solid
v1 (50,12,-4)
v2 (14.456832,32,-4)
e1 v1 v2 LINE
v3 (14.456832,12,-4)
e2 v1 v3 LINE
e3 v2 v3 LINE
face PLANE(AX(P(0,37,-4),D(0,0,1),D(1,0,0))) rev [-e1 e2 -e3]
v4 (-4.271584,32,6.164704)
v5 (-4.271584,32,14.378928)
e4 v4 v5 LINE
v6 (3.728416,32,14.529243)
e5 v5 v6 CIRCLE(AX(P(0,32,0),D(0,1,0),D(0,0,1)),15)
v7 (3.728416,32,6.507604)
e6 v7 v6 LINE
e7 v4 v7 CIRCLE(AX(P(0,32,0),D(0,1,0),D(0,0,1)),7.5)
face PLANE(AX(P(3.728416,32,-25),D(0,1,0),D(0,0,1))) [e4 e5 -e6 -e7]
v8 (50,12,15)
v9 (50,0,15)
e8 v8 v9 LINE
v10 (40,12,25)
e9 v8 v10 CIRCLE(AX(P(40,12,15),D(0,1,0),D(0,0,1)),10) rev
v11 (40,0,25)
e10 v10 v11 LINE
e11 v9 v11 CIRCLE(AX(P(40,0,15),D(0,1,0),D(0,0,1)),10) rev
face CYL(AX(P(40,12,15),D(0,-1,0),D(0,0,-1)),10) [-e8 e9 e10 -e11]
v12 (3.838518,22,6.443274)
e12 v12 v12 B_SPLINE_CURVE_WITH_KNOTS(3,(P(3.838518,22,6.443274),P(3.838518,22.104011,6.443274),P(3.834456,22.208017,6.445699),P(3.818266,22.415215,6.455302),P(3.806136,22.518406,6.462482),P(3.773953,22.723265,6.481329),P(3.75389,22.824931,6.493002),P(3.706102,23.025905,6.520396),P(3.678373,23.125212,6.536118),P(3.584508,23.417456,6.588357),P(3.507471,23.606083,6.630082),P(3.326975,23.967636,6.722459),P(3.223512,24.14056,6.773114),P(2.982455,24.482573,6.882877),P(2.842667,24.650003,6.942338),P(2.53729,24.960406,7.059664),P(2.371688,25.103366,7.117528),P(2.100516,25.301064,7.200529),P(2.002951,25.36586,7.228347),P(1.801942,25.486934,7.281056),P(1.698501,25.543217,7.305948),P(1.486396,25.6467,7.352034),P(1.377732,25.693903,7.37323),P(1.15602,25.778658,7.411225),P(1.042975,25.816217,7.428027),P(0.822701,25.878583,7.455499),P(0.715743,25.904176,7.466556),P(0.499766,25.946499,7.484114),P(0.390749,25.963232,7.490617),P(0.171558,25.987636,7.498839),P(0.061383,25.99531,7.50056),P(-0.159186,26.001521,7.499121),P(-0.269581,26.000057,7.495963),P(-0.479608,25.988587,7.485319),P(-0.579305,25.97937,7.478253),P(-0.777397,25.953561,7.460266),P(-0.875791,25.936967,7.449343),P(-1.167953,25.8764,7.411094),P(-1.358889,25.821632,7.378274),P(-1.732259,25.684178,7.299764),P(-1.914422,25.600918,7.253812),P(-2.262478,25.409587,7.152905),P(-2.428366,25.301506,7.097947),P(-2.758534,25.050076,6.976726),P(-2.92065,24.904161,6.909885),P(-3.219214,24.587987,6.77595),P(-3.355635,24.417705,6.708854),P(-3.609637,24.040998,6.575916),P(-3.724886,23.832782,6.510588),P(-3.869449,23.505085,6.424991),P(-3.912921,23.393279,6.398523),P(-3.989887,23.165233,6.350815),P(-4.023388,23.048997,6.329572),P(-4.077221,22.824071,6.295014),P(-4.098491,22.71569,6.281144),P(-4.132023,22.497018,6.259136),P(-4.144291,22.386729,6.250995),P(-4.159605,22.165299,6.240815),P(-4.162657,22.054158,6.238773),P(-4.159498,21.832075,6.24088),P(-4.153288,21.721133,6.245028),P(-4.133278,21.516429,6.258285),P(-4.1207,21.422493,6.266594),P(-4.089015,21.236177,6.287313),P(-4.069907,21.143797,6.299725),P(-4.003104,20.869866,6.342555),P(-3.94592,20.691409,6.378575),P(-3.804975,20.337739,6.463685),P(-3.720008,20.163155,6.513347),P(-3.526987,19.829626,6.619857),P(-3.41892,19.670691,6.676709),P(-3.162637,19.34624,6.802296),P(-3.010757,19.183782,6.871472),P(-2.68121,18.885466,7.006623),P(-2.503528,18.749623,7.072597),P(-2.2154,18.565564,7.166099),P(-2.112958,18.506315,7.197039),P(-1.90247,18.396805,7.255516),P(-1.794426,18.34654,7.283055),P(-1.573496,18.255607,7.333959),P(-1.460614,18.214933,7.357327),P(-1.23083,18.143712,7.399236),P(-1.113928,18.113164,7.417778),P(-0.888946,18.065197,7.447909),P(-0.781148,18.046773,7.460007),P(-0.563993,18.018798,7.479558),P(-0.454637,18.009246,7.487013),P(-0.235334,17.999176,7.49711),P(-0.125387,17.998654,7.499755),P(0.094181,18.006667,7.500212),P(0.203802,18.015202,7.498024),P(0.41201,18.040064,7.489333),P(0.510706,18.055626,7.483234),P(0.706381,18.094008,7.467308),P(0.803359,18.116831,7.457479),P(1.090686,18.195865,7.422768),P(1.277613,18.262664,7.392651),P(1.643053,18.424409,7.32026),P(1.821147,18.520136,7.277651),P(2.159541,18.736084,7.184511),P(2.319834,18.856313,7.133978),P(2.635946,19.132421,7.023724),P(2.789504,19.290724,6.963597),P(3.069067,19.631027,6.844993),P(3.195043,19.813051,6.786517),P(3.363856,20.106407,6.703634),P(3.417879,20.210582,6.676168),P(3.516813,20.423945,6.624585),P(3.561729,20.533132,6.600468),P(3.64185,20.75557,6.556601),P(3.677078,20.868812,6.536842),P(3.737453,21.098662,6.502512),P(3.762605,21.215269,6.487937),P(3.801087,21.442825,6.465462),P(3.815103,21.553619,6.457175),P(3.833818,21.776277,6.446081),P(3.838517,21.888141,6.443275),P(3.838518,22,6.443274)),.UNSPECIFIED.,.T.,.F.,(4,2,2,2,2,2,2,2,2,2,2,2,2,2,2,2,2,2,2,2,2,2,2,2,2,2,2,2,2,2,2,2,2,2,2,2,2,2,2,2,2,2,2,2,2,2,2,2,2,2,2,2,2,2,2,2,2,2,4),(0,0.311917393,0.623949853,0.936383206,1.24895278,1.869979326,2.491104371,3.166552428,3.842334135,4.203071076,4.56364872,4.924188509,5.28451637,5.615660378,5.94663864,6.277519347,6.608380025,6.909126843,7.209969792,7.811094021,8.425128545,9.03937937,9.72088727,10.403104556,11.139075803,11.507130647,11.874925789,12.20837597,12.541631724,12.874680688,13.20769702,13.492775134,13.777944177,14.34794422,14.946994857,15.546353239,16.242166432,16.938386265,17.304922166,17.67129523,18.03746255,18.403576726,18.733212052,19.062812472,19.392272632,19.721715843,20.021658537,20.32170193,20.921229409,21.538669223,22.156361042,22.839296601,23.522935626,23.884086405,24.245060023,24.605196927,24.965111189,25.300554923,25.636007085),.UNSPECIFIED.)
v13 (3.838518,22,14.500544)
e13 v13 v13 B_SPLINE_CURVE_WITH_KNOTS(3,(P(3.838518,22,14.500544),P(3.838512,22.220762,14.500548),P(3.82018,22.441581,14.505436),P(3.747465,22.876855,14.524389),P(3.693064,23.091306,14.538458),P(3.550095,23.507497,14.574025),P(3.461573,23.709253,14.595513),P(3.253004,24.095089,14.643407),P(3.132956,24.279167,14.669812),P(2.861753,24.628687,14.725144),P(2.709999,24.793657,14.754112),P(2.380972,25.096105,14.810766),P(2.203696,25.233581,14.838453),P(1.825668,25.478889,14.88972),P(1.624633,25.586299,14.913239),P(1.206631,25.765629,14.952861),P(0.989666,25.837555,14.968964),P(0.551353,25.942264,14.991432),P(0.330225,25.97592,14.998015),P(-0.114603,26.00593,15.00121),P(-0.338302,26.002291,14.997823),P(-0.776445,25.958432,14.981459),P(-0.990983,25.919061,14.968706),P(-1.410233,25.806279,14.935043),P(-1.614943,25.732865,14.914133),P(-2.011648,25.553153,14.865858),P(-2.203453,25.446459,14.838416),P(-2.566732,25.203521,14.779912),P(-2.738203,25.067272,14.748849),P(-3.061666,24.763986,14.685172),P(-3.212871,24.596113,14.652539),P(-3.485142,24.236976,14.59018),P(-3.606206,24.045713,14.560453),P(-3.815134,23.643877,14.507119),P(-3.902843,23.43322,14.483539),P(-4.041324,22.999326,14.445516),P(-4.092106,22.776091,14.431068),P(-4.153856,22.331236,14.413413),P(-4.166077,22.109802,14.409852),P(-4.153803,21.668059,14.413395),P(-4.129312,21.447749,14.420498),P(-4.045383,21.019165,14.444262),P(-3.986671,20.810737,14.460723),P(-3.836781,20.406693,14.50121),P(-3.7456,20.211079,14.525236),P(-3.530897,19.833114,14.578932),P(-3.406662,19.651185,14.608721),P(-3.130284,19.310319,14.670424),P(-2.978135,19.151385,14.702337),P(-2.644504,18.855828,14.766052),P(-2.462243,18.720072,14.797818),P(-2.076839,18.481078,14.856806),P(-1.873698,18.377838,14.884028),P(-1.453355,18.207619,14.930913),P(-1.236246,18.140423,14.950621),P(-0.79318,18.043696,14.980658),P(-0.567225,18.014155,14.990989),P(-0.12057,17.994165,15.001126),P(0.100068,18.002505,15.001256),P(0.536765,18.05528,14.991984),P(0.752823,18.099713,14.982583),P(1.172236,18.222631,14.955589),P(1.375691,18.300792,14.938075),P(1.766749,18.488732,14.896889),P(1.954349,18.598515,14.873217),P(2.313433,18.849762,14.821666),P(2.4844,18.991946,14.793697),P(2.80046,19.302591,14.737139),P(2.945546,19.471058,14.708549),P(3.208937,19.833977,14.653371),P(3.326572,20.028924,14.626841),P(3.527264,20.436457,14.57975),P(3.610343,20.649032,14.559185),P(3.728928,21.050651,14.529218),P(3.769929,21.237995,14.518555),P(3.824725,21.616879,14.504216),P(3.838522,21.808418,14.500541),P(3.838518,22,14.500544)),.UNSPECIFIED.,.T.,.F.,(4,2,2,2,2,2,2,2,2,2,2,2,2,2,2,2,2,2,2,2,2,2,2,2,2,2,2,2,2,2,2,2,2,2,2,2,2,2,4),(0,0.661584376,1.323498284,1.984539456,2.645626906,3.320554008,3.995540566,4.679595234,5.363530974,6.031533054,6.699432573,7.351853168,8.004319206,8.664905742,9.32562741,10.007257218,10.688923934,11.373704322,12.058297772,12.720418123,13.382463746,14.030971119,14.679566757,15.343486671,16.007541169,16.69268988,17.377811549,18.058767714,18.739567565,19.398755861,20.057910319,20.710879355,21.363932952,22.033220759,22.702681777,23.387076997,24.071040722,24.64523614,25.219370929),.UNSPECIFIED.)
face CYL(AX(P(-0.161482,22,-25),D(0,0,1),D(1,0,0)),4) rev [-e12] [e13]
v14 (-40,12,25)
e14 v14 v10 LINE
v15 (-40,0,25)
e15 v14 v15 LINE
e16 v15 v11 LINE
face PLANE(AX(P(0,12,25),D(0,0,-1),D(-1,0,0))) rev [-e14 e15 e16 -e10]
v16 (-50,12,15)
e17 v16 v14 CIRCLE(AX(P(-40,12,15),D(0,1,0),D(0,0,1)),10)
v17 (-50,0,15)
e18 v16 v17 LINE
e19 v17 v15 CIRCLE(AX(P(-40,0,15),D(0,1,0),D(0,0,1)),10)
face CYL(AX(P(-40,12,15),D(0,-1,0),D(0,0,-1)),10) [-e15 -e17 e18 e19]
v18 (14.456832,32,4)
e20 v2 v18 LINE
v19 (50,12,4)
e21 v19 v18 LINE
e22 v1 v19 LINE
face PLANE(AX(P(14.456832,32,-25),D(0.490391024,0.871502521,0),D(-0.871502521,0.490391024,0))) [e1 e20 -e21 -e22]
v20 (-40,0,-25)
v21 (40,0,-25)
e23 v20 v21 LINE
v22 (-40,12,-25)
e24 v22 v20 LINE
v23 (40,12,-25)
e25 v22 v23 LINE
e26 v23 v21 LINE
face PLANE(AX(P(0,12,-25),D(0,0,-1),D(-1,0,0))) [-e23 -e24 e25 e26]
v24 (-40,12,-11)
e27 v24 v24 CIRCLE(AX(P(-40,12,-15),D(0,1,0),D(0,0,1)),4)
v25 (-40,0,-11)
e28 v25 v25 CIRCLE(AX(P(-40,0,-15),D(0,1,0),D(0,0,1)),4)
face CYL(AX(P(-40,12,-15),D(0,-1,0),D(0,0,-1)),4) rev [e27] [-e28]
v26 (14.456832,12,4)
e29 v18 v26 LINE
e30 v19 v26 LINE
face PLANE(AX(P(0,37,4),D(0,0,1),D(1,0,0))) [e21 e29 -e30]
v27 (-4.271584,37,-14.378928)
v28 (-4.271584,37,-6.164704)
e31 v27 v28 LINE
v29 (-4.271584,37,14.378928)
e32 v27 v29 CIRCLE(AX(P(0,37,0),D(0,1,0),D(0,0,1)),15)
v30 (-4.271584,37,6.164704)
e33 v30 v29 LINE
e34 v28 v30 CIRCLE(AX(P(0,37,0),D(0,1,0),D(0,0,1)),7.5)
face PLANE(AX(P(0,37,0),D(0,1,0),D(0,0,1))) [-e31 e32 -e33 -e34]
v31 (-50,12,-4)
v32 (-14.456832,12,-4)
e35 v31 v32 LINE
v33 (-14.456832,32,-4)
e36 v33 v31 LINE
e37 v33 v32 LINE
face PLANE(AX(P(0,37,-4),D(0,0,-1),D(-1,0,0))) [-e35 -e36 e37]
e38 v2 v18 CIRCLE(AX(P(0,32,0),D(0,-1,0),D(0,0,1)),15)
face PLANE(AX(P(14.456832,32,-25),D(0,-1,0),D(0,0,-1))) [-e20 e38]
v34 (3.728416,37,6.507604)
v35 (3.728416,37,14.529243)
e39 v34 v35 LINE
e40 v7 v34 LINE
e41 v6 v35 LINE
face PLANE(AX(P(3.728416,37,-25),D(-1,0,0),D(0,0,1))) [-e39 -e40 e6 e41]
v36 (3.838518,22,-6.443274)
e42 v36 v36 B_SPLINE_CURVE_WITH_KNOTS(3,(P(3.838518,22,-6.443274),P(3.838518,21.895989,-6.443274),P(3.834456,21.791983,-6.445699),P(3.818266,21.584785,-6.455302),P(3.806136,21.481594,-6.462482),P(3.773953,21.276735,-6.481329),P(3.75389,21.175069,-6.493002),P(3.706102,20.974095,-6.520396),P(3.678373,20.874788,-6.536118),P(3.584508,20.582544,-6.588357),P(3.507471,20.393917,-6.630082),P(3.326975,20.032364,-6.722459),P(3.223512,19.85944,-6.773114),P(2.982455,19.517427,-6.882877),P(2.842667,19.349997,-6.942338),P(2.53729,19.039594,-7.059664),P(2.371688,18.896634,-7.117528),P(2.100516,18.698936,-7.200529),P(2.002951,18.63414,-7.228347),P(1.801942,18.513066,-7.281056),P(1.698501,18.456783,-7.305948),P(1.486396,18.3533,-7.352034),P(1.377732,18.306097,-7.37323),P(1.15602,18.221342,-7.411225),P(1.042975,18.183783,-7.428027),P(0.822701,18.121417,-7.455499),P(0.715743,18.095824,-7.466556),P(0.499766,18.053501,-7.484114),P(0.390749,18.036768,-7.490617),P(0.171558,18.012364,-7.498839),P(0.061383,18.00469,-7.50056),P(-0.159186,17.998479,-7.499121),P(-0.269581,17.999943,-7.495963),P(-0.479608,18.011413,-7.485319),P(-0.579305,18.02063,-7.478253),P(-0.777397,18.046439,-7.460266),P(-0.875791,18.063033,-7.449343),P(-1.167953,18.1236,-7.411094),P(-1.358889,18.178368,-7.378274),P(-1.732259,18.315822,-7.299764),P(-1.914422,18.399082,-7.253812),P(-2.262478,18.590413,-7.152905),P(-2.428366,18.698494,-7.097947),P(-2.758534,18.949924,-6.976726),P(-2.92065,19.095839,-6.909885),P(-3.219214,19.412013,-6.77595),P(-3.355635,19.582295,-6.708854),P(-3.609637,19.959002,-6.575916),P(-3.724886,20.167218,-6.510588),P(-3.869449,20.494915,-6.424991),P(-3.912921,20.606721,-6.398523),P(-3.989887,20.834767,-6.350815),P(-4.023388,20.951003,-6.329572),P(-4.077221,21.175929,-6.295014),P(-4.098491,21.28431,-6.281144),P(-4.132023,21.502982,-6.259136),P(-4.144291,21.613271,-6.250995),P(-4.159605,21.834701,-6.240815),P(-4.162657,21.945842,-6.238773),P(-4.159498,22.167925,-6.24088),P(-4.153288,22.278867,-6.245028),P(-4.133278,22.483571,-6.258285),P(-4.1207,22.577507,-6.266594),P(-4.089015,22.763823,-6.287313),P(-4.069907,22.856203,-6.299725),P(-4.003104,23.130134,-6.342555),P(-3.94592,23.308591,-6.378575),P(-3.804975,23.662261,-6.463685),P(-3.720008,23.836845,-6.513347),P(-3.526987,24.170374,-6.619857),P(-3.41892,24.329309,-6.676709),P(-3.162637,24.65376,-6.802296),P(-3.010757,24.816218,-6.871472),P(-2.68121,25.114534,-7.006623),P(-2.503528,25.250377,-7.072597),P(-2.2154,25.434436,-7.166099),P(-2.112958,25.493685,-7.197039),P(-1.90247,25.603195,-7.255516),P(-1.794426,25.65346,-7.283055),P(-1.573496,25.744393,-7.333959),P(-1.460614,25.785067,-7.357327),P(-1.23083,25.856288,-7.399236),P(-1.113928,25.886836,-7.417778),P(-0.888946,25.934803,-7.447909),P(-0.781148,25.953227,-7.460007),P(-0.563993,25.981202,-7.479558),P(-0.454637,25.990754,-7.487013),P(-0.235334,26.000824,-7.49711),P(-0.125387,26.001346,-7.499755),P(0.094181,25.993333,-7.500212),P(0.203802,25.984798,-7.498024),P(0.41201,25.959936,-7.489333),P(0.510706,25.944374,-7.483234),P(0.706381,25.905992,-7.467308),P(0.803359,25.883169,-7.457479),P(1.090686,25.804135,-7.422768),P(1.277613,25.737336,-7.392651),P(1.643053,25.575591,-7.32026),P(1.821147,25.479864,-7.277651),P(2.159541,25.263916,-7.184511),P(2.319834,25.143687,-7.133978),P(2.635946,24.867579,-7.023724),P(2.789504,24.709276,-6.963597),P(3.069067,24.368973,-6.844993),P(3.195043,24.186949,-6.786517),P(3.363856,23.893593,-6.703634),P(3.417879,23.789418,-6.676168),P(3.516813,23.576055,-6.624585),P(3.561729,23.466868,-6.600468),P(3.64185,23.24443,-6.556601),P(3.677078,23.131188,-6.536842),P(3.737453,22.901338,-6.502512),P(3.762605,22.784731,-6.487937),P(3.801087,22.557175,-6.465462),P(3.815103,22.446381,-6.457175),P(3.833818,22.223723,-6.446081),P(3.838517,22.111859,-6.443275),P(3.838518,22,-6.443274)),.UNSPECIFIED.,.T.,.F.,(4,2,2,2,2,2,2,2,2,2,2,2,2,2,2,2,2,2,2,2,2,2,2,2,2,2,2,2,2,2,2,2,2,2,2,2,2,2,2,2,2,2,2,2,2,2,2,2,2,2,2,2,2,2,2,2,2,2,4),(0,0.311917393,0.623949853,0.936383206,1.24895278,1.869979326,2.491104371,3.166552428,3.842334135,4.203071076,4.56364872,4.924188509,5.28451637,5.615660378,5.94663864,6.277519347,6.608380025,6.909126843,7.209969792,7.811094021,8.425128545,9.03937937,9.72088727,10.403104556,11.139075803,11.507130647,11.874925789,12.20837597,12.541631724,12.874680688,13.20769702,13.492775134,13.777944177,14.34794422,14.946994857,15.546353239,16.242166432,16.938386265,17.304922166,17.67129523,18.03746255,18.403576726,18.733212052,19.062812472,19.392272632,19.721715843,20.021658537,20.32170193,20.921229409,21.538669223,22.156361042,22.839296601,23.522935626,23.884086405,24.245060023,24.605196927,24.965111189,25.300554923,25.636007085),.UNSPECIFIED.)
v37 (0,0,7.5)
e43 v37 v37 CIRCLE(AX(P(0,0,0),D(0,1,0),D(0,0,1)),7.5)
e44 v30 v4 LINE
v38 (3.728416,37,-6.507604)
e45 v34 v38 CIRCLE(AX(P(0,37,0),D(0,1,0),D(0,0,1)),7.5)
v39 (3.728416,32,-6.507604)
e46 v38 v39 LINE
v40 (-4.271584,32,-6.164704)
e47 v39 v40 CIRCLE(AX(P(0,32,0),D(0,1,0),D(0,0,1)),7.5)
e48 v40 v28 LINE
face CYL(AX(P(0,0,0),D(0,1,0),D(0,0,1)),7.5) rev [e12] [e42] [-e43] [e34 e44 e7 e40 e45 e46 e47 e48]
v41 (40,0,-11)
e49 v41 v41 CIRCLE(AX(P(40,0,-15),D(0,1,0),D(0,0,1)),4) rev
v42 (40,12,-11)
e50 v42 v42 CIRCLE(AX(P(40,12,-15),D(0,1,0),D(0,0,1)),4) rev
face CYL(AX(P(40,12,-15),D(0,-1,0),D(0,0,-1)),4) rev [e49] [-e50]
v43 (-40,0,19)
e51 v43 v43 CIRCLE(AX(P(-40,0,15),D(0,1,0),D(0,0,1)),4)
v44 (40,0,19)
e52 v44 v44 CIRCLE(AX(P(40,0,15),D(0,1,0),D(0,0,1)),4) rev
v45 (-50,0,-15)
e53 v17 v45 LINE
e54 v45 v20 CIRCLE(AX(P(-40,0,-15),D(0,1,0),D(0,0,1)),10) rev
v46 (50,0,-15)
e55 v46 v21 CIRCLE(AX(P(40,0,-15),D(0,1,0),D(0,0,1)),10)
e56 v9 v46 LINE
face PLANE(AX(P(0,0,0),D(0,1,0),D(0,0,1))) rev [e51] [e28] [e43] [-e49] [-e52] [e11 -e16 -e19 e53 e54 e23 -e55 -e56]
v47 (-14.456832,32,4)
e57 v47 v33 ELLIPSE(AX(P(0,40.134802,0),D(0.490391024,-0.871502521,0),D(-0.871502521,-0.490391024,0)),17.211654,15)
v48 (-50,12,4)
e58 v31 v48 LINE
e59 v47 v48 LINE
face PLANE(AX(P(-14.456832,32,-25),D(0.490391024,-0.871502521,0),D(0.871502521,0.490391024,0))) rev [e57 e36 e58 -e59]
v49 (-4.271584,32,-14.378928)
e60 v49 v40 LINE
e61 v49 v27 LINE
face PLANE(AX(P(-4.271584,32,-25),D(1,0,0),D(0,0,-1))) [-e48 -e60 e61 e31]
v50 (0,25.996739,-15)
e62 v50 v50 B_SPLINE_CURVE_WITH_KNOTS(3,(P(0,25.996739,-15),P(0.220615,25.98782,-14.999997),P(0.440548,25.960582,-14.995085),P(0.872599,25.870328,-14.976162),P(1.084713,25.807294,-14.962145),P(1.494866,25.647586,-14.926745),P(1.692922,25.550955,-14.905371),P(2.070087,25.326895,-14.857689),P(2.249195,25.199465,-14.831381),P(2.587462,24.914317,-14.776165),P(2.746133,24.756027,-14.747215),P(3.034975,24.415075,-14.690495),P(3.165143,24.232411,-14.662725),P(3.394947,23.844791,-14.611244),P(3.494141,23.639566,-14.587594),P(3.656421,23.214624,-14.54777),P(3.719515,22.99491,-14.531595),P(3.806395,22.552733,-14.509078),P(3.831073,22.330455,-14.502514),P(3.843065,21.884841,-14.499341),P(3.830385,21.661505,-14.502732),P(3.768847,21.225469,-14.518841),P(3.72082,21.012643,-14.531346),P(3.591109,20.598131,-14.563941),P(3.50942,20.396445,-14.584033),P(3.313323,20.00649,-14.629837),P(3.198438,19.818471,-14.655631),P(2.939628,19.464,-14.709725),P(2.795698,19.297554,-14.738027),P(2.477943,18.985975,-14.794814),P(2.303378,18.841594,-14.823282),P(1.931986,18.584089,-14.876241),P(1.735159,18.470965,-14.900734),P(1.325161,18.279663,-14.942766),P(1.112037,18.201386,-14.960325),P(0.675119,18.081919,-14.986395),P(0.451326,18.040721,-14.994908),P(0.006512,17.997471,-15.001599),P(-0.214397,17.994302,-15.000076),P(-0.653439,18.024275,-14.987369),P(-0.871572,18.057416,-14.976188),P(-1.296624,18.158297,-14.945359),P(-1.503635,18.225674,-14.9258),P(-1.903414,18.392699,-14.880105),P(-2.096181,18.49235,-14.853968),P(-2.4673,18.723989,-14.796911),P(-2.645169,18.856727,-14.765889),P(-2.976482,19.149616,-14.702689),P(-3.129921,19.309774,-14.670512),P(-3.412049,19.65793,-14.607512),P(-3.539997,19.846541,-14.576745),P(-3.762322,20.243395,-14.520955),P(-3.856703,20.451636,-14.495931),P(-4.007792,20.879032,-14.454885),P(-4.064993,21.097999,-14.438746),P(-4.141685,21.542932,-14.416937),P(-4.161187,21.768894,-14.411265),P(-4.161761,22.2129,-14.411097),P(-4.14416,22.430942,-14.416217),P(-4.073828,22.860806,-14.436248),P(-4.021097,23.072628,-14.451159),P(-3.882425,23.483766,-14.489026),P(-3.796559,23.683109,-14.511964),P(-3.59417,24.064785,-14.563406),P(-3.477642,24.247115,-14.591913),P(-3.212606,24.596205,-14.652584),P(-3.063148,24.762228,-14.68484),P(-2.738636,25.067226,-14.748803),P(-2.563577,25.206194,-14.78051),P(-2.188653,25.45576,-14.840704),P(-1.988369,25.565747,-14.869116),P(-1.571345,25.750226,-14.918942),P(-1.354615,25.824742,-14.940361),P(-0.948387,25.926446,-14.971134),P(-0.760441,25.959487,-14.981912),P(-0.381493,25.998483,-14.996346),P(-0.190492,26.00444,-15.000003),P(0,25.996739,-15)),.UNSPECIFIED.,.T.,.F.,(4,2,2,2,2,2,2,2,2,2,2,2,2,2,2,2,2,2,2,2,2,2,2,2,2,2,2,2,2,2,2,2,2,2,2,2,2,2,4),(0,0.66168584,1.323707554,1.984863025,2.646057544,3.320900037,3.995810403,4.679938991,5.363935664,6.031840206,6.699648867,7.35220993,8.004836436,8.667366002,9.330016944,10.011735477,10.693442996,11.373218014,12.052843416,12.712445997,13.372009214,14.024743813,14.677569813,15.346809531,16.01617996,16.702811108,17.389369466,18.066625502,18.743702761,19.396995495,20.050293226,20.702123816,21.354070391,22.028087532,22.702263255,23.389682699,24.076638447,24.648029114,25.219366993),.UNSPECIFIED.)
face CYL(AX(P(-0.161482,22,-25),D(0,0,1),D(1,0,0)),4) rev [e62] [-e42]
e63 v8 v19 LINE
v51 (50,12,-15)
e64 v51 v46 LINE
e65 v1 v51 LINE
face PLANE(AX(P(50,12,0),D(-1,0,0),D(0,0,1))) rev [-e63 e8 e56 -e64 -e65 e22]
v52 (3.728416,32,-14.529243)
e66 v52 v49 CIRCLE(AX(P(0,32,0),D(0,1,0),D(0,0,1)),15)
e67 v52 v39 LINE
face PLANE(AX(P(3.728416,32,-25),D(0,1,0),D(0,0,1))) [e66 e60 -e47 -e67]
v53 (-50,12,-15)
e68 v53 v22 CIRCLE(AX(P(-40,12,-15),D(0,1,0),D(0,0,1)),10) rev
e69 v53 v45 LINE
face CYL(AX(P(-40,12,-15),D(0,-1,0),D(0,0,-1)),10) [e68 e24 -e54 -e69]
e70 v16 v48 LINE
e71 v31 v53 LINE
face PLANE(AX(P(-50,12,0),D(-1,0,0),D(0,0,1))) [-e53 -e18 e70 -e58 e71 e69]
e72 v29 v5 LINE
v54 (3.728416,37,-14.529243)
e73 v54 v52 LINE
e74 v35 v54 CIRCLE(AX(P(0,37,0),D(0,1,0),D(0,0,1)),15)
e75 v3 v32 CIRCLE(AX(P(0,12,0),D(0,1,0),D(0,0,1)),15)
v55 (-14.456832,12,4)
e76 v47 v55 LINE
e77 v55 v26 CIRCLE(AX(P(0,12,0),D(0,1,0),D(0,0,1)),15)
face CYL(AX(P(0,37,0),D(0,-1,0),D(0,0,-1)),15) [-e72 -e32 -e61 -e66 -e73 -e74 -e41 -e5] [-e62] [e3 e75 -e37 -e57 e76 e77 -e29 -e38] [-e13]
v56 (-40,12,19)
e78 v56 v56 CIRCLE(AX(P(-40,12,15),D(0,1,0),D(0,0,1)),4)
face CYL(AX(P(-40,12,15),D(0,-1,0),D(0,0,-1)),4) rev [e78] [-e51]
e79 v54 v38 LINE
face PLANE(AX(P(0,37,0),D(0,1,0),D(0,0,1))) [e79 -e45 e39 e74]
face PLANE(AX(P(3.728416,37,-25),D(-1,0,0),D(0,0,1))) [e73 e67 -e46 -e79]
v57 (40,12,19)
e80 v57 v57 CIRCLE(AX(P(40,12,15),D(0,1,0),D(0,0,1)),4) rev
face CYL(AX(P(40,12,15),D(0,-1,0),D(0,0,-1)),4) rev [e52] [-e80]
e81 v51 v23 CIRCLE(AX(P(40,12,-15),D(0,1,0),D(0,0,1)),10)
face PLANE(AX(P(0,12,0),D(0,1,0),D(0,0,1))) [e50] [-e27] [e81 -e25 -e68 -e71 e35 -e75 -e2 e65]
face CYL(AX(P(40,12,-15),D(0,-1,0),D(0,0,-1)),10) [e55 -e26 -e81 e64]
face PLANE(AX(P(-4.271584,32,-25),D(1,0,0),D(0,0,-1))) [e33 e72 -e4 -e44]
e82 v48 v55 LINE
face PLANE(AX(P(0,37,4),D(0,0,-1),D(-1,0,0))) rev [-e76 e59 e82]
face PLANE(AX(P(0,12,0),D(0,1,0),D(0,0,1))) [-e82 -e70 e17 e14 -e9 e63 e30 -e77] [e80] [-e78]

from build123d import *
from build123d.topology import SkipClean

# Parameters (mm, degrees)
SKETCH_1_R          = 4
EXTRUDE_1_DEPTH     = 12
EXTRUDE_3_DEPTH     = 25
CUT_EXTRUDE_START   = -5
CUT_EXTRUDE_2_DEPTH = 5
SKETCH_6_R          = 4
SKETCH_6_W          = 8
SKETCH_6_H          = 5
CUT_EXTRUDE_3_DEPTH = 69.62944
SKETCH_10_R         = 7.5
CUT_EXTRUDE_4_DEPTH = 68.037303


with BuildPart() as part:
    # 草图1 → 凸台-拉伸1 (new body)
    with BuildSketch(Plane(origin=(0, 0, 0), x_dir=(1, 0, 0), z_dir=(0, 1, 0))):
        with BuildLine():
            ThreePointArc((-40, 25), (-47.071068, 22.071068), (-50, 15))
            Line((-50, 15), (-50, -15))
            ThreePointArc((-50, -15), (-47.071068, -22.071068), (-40, -25))
            Line((-40, -25), (40, -25))
            ThreePointArc((40, -25), (47.071068, -22.071068), (50, -15))
            Line((50, -15), (50, 15))
            ThreePointArc((50, 15), (47.071068, 22.071068), (40, 25))
            Line((40, 25), (-40, 25))
        make_face()
        with Locations((-40, -15)):
            Circle(SKETCH_1_R, mode=Mode.SUBTRACT)
        with Locations((40, -15)):
            Circle(SKETCH_1_R, mode=Mode.SUBTRACT)
        with Locations((-40, 15)):
            Circle(SKETCH_1_R, mode=Mode.SUBTRACT)
        with Locations((40, 15)):
            Circle(SKETCH_1_R, mode=Mode.SUBTRACT)
    extrude(amount=EXTRUDE_1_DEPTH)

    # 草图3 → 凸台-拉伸3 (add)
    with BuildSketch(Plane(origin=(0, 12, 0), x_dir=(1, 0, 0), z_dir=(0, 1, 0))):
        with BuildLine():
            Line((-50, -4), (-14.456832, -4))
            ThreePointArc((-14.456832, -4), (15, 0), (-14.456832, 4))
            Line((-14.456832, 4), (-50, 4))
            Line((-50, 4), (-50, -4))
        make_face()
    extrude_3 = extrude(amount=EXTRUDE_3_DEPTH)

    # 草图7 → 切除-拉伸2 (cut)
    with SkipClean():  # the faces are left unmerged after this step: merging them gives an invalid solid
        with BuildSketch(Plane(origin=(0, 37, 0), x_dir=(1, 0, 0), z_dir=(0, 1, 0)).offset(CUT_EXTRUDE_START)):
            with BuildLine():
                Line((-14.456832, 4), (-50, 4))
                Line((-50, 4), (-50, -4))
                Line((-50, -4), (-14.456832, -4))
                ThreePointArc((-14.456832, -4), (-15, 0), (-14.456832, 4))
            make_face()
        cut_extrude_2 = extrude(amount=CUT_EXTRUDE_2_DEPTH, mode=Mode.SUBTRACT)

    # 草图6 → 切除-拉伸3 (cut, symmetric)
    with SkipClean():  # the faces are left unmerged after this step: merging them gives an invalid solid
        with BuildSketch(Plane.XY.offset(4)):
            with Locations((0.161482, 22)):
                Circle(SKETCH_6_R)
            Polygon((-14.456832, 32), (-50, 12), (-50, 32), align=None)
            with Locations((0.271584, 34.5)):
                Rectangle(SKETCH_6_W, SKETCH_6_H)
        cut_extrude_3 = extrude(amount=CUT_EXTRUDE_3_DEPTH, both=True, mode=Mode.SUBTRACT)

    # 镜向3: 凸台-拉伸3, 切除-拉伸2, 切除-拉伸3 across plane
    add(extrude_3.mirror(Plane(origin=(0, 0, 0), x_dir=(0, 0, 1), z_dir=(1, 0, 0))))
    add(cut_extrude_2.mirror(Plane(origin=(0, 0, 0), x_dir=(0, 0, 1), z_dir=(1, 0, 0))), mode=Mode.SUBTRACT)
    add(cut_extrude_3.mirror(Plane(origin=(0, 0, 0), x_dir=(0, 0, 1), z_dir=(1, 0, 0))), mode=Mode.SUBTRACT)

    # 草图10 → 切除-拉伸4 (cut, through all)
    with BuildSketch(Plane(origin=(0, 37, 0), x_dir=(1, 0, 0), z_dir=(0, 1, 0))):
        Circle(SKETCH_10_R)
    extrude(amount=-CUT_EXTRUDE_4_DEPTH, mode=Mode.SUBTRACT)


solid = part.part
